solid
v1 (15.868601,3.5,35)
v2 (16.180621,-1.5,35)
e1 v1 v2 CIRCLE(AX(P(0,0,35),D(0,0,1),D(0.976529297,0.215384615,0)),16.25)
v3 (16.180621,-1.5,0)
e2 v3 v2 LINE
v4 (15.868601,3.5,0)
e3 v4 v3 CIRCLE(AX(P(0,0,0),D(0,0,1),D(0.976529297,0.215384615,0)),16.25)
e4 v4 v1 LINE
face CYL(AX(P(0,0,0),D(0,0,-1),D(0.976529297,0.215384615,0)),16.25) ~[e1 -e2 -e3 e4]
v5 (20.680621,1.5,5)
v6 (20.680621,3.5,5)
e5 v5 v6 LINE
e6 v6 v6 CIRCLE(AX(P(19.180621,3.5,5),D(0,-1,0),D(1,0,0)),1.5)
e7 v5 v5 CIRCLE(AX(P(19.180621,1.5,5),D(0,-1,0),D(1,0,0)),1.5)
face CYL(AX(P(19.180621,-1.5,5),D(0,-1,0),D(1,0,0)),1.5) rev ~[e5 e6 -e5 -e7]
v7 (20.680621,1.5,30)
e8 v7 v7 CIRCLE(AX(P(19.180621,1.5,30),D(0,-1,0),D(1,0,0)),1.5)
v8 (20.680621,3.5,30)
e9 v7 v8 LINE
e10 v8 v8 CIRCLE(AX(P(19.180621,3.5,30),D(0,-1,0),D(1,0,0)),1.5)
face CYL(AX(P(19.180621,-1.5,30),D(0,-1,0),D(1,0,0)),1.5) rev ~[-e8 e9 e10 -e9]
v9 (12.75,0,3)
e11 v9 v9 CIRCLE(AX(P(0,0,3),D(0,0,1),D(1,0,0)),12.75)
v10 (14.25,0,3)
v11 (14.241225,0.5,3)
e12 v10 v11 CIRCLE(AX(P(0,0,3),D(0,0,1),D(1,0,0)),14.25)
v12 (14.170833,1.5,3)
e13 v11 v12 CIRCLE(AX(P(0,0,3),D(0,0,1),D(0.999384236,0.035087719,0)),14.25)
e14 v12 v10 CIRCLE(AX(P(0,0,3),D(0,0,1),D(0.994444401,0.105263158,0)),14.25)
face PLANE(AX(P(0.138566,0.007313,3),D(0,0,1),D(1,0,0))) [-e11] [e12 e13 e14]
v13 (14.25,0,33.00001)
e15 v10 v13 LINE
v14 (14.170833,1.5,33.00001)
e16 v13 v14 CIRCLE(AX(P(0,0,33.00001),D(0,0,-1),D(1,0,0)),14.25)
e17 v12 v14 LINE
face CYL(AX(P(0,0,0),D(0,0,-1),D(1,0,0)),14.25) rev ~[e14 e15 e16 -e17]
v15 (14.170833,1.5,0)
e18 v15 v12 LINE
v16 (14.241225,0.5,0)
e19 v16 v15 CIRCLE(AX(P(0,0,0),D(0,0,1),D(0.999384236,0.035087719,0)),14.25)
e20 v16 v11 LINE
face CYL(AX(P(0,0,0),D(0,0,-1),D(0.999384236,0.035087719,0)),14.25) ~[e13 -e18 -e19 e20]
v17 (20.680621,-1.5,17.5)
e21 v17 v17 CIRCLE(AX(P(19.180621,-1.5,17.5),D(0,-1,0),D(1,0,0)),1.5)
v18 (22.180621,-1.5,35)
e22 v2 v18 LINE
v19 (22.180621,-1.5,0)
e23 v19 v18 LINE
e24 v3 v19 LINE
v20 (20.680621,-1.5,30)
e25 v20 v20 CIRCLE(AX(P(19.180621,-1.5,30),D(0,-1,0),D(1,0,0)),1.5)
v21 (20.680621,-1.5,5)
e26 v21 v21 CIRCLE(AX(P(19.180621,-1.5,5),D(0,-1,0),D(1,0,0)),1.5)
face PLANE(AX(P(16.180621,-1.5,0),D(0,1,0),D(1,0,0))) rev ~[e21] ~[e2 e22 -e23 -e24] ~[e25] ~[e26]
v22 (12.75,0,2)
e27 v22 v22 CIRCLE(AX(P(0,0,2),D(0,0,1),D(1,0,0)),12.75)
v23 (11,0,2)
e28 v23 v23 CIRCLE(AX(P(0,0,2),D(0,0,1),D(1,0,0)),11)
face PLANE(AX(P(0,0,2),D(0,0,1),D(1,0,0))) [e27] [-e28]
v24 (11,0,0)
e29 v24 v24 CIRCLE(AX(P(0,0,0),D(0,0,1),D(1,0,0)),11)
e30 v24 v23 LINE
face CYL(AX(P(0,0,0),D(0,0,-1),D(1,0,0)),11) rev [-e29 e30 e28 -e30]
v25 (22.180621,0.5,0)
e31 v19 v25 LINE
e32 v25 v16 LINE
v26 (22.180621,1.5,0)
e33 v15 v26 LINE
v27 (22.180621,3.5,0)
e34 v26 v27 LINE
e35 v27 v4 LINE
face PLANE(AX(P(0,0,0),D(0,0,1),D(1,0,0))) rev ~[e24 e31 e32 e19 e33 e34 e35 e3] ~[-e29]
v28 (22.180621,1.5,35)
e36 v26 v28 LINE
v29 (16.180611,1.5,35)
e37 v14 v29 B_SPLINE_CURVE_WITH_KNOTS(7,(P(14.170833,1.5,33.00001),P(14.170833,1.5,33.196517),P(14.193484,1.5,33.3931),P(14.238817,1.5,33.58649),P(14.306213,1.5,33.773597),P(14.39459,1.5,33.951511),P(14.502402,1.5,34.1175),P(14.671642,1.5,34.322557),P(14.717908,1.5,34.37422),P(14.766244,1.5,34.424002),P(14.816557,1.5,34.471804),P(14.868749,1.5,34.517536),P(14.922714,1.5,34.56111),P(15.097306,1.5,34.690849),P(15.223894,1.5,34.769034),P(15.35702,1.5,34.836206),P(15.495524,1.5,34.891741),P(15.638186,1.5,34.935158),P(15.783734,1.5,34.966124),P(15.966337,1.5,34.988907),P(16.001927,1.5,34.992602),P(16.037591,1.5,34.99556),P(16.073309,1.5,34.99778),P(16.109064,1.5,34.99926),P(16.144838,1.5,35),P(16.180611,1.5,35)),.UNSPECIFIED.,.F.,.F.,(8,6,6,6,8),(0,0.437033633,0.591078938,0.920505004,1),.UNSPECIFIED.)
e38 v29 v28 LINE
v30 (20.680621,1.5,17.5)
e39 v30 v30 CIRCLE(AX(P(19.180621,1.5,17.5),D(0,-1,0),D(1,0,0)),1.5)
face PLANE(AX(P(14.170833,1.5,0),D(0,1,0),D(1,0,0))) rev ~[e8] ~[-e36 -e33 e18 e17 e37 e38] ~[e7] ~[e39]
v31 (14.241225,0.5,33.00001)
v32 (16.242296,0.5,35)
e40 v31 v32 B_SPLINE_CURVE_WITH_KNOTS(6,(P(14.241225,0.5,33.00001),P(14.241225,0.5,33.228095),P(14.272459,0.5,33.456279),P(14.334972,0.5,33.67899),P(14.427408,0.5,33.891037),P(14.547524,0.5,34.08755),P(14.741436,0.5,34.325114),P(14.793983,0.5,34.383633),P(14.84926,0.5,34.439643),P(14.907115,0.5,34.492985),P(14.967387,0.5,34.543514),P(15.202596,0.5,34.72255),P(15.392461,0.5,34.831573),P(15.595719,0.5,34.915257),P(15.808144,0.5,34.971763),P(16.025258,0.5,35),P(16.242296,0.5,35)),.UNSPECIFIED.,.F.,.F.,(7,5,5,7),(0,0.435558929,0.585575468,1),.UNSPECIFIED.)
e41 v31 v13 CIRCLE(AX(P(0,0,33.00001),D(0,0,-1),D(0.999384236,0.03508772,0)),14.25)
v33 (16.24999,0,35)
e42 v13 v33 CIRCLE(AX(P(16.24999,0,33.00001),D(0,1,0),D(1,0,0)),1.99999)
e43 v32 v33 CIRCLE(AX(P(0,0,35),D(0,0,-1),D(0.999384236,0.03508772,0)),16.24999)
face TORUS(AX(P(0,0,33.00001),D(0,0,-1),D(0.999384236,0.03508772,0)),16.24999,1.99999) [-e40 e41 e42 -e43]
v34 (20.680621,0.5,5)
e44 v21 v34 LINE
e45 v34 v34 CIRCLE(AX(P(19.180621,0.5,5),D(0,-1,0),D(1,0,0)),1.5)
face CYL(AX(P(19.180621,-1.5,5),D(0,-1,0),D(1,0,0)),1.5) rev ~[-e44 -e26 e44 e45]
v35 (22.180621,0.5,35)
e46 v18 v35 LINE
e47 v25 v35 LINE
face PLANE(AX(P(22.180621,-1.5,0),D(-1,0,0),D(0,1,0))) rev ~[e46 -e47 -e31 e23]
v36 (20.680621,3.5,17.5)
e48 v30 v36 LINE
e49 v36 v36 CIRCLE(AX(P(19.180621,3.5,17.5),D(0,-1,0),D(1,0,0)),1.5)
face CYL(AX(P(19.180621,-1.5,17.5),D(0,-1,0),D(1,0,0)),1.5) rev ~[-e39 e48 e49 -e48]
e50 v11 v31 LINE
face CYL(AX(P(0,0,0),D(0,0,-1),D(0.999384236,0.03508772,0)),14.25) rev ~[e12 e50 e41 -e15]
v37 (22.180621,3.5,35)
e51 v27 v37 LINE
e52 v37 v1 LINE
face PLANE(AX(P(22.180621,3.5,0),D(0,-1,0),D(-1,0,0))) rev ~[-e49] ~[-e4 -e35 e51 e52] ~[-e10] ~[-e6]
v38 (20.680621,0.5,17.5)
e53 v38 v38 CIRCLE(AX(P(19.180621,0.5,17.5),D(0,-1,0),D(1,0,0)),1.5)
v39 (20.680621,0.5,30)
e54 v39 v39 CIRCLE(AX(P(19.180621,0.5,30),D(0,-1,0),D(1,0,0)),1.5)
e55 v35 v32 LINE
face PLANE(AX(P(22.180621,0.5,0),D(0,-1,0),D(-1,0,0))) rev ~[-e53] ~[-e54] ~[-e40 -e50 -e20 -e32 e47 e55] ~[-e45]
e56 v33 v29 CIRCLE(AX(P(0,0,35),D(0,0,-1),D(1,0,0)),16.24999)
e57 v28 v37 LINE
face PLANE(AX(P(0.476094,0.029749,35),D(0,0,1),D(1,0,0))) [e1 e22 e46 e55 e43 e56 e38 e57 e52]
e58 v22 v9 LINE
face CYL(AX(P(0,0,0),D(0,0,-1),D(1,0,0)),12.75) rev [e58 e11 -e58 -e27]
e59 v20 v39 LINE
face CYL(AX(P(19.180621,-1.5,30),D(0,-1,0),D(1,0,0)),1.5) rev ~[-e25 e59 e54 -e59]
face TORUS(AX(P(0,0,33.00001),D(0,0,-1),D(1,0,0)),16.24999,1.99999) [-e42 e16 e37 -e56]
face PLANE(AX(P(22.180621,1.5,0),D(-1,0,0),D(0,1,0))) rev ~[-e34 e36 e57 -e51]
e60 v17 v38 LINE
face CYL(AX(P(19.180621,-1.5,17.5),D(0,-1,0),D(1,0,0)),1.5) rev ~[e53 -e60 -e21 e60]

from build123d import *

# Parameters (mm, degrees)
F1_DEPTH = 35
F0_R     = 12.75
F2_DEPTH = 3
F0_R_2   = 11
F3_DEPTH = 2
F4_R     = 1.5
F5_DEPTH = 25
F6_R     = 1.99999


# Not quite as in the source:
# - a fillet or chamfer is up to 0.001 mm smaller than in the source, because OpenCascade refuses the exact size


with BuildPart() as f1:
    # F0 (on Top) → F1 (new body)
    with BuildSketch(Plane.XY):
        with BuildLine():
            ThreePointArc((14.2412253686, 0.5), (14.2478061733, 0.2500384941), (14.25, 0))
            ThreePointArc((14.25, 0), (-14.2301944166, -0.7510438499), (14.1708327208, 1.5))
            Line((14.1708327208, 1.5), (16.1806211253, 1.5))
            ThreePointArc((16.1806211253, 1.5), (16.055782786, 2.5048630957), (15.8686010726, 3.5))
            ThreePointArc((15.8686010726, 3.5), (-16.2184512476, -1.0120964027), (16.1806211253, -1.5))
            ThreePointArc((16.1806211253, -1.5), (16.2326460148, -0.7508018094), (16.25, 0))
            ThreePointArc((16.25, 0), (16.2480763538, 0.2500295981), (16.2423058708, 0.5))
            Line((16.2423058708, 0.5), (16.1806211253, 0.5))
            Line((16.1806211253, 0.5), (14.2412253686, 0.5))
        make_face()
        with BuildLine():
            ThreePointArc((15.8686010726, 3.5), (16.055782786, 2.5048630957), (16.1806211253, 1.5))
            Line((16.1806211253, 1.5), (22.1806211253, 1.5))
            Line((22.1806211253, 1.5), (22.1806211253, 3.5))
            Line((22.1806211253, 3.5), (15.8686010726, 3.5))
        make_face()
        with BuildLine():
            Line((22.1806211253, 0.5), (16.2423058708, 0.5))
            ThreePointArc((16.2423058708, 0.5), (16.2480763538, 0.2500295981), (16.25, 0))
            ThreePointArc((16.25, 0), (16.2326460148, -0.7508018094), (16.1806211253, -1.5))
            Line((16.1806211253, -1.5), (22.1806211253, -1.5))
            Line((22.1806211253, -1.5), (22.1806211253, 0.5))
        make_face()
    extrude(amount=F1_DEPTH)

    # F0 (on Top) → F2 (join)
    with BuildSketch(Plane.XY):
        with BuildLine():
            ThreePointArc((14.1708327208, 1.5), (-14.2301944166, -0.7510438499), (14.25, 0))
            ThreePointArc((14.25, 0), (14.2478061733, 0.2500384941), (14.2412253686, 0.5))
            ThreePointArc((14.2412253686, 0.5), (14.2148254023, 1.0006191989), (14.1708327208, 1.5))
        make_face()
        Circle(F0_R, mode=Mode.SUBTRACT)
    extrude(amount=F2_DEPTH)

    # F0 (on Top) → F3 (join)
    with BuildSketch(Plane.XY):
        Circle(F0_R)
        Circle(F0_R_2, mode=Mode.SUBTRACT)
    extrude(amount=F3_DEPTH)

    # F4 (on face) → F5 (cut)
    with BuildSketch(Plane.XZ.offset(1.5)):
        with Locations((19.1806211253, 30)):
            Circle(F4_R)
        with Locations((19.1806211253, 5)):
            Circle(F4_R)
        with Locations((19.1806211253, 17.5)):
            Circle(F4_R)
    extrude(amount=-F5_DEPTH, mode=Mode.SUBTRACT)

    # F6 (radius 2 in the source; OpenCascade refuses exactly that, so slightly less here)
    f6_edges = [f1.edges().sort_by_distance(p)[0] for p in [
        (-14.214825, -1.000619, 35),
    ]]
    fillet(f6_edges, radius=F6_R)


solid = f1.part
